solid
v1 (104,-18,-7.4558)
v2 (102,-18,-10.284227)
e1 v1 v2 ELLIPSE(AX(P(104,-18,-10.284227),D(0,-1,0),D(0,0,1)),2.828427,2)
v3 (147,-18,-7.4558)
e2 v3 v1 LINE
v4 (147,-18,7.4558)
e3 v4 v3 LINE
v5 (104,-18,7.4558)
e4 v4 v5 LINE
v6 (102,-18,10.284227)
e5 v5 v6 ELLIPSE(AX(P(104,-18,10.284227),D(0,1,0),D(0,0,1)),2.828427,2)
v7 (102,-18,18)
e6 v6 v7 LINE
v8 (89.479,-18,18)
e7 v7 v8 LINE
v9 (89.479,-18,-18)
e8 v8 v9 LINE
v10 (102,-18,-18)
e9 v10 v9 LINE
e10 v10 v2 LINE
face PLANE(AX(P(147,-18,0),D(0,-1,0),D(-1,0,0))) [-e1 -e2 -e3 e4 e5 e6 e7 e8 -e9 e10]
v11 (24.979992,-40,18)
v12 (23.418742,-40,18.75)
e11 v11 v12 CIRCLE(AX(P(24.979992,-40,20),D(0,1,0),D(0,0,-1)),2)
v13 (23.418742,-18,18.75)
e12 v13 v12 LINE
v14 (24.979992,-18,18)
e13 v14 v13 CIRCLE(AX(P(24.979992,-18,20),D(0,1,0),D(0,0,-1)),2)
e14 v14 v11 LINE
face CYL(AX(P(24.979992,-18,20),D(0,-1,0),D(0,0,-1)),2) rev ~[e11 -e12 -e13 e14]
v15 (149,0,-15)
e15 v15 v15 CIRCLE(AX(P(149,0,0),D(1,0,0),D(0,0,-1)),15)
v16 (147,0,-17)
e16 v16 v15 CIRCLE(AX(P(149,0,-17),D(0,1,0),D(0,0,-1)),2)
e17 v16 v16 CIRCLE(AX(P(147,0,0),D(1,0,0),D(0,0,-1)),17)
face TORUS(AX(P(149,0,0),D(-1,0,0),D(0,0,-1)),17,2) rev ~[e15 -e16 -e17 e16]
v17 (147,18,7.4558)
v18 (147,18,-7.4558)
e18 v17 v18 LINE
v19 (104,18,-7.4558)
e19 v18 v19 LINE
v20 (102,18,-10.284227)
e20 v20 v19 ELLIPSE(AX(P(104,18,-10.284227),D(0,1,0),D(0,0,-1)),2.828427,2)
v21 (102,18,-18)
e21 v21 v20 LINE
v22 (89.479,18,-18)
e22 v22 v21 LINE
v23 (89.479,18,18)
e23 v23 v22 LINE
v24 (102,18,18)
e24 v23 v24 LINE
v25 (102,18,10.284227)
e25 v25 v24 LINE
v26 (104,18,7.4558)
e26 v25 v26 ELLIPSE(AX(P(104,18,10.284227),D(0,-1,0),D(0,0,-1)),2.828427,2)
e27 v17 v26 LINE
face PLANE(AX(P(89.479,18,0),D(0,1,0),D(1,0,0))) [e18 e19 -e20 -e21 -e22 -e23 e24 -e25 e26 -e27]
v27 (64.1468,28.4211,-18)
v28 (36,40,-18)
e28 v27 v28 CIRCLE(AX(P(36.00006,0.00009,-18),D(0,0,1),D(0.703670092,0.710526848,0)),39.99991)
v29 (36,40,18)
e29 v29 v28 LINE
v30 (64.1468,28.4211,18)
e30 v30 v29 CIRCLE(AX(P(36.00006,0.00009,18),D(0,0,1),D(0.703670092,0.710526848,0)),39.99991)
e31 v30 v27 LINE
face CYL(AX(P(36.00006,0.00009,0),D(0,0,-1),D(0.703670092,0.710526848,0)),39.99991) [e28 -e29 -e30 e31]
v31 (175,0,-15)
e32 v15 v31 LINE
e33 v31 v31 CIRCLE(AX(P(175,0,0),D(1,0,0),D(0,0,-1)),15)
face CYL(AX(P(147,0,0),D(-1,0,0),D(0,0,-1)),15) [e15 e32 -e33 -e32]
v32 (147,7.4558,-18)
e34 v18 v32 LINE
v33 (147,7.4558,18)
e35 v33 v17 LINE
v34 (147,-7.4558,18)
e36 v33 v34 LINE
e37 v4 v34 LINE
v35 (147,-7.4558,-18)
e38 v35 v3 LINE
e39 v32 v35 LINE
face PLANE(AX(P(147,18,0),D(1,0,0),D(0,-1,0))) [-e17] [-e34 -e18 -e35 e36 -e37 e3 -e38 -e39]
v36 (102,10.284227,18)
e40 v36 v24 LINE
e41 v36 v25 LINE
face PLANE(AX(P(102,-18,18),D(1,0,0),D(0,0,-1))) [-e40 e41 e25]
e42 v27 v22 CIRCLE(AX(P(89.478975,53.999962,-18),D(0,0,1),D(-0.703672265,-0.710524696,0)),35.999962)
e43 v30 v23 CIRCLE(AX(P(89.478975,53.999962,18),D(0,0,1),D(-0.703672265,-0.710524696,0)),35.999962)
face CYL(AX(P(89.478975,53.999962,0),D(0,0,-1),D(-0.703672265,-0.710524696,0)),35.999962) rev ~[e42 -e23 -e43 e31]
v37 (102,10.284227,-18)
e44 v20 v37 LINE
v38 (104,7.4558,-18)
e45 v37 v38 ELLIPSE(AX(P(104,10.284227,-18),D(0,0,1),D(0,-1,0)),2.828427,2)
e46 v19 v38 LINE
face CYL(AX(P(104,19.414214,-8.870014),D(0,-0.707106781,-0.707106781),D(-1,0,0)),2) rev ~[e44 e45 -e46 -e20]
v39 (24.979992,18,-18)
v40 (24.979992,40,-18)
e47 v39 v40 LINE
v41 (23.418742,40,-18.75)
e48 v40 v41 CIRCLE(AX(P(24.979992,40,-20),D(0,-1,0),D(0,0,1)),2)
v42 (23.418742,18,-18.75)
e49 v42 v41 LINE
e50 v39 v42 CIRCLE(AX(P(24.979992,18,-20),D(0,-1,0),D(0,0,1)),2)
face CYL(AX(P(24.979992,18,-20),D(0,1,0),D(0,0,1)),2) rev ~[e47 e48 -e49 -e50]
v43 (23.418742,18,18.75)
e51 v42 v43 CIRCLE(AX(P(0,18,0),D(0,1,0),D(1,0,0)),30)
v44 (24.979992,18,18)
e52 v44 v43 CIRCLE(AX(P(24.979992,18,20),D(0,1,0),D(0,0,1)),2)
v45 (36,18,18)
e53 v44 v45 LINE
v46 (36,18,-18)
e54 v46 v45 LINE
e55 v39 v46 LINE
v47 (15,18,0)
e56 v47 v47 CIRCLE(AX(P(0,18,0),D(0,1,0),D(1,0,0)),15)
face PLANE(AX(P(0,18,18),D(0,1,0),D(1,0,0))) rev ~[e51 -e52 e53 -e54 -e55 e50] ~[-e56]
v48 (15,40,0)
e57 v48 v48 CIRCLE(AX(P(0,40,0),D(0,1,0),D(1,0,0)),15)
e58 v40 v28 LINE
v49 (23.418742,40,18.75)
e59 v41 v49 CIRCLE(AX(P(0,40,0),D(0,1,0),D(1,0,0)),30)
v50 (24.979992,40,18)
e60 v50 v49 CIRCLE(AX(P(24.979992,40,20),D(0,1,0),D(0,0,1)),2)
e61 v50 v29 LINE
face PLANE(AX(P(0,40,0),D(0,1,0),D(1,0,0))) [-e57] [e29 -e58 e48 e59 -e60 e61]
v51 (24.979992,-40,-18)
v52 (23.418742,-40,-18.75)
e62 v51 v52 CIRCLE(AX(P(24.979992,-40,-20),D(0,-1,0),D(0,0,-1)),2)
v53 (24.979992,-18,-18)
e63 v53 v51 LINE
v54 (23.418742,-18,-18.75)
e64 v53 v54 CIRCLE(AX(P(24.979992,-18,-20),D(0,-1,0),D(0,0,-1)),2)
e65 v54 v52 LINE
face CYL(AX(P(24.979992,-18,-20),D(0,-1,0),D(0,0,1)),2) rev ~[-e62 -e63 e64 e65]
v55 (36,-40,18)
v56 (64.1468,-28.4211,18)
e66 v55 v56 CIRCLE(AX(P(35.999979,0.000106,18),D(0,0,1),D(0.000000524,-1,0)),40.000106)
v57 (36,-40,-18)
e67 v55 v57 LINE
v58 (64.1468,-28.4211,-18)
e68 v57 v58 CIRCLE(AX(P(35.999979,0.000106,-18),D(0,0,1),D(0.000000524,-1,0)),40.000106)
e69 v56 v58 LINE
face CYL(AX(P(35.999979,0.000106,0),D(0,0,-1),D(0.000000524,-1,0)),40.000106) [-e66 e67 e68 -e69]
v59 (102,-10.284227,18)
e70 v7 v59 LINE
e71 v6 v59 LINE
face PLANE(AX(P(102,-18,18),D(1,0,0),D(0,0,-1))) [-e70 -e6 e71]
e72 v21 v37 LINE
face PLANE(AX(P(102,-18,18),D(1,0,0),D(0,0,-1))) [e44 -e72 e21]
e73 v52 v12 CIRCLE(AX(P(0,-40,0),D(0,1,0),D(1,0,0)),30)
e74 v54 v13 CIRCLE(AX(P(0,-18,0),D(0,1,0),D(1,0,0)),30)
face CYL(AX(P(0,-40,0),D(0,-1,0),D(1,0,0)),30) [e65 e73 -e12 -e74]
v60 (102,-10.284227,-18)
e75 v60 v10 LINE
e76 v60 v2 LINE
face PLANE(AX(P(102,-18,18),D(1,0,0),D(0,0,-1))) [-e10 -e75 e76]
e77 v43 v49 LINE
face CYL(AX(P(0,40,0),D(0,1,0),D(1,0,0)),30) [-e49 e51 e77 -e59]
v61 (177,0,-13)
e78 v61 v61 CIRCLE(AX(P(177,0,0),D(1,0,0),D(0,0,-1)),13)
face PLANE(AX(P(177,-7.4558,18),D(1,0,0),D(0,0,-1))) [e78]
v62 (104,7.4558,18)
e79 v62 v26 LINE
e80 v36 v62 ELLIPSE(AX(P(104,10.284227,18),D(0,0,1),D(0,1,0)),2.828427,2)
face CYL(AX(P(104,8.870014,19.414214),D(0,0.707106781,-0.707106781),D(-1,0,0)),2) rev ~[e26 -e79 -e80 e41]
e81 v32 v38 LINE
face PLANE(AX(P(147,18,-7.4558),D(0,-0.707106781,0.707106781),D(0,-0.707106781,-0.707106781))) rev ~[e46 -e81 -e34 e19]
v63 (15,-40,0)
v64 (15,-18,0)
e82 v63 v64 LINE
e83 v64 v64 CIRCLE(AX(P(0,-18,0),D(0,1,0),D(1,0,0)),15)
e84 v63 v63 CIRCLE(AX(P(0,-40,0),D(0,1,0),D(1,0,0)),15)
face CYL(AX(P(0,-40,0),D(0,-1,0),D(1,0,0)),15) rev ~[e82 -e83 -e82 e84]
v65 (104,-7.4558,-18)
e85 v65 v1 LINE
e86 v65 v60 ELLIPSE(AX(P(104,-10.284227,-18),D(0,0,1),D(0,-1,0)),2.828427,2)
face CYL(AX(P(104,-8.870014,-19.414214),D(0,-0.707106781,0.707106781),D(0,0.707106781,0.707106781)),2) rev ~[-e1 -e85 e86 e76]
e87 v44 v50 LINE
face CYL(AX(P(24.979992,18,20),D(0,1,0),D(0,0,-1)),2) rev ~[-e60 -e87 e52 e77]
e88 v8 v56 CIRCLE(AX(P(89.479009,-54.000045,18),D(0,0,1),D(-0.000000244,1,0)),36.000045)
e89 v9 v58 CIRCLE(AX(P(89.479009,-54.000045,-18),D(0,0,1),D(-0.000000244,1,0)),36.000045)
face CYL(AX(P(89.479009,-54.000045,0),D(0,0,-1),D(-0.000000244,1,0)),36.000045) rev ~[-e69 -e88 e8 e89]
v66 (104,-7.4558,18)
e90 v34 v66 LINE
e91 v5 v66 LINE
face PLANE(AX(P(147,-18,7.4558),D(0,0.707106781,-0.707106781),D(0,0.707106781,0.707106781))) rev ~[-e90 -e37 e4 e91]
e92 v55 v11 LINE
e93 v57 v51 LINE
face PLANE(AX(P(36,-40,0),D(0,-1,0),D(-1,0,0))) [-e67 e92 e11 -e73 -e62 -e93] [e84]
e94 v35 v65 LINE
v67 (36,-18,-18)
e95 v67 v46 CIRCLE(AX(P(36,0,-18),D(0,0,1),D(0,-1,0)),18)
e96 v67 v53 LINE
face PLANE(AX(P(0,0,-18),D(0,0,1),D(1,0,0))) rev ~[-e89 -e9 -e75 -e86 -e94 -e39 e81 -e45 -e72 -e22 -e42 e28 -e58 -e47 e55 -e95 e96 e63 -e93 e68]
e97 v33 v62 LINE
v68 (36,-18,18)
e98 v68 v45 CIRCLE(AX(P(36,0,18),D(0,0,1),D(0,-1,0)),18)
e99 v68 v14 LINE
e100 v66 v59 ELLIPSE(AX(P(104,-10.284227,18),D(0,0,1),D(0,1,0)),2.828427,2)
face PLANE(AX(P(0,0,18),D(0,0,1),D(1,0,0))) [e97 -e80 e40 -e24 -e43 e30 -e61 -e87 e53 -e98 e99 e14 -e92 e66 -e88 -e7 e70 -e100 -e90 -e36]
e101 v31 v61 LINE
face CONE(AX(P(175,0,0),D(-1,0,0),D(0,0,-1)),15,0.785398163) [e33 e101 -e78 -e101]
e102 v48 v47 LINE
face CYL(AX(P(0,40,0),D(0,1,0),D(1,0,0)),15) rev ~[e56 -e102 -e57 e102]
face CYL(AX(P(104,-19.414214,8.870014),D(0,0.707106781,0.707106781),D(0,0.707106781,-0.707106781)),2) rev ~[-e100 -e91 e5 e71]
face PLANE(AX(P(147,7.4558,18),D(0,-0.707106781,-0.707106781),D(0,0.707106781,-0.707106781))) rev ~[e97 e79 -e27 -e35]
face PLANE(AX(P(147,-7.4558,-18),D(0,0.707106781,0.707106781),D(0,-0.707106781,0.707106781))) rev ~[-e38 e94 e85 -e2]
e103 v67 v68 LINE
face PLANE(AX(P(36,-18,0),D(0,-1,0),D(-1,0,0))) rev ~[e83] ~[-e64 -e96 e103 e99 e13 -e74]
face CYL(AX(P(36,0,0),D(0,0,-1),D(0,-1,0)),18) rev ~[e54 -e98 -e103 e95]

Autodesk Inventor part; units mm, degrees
ref_plane "YZ Plane" through (0, 0, 0) normal (1, 0, 0) x (0, 1, 0)
ref_plane "XZ Plane" through (0, 0, 0) normal (0, 1, 0) x (-1, 0, 0)
ref_plane "XY Plane" through (0, 0, 0) normal (0, 0, 1) x (1, 0, 0)
sketch "Sketch2" plane through (0, 0, 0) normal (0, 0, 1) x (1, 0, 0)
  line L0 (0, 18) -> (36, 18)
  line L1 (36, -18) -> (0, -18)
  arc A0 (36, -18) -> (36, 18) centre (36, 0) ccw
  line L2 (0, 40) -> (36, 40)
  line L3 (36, -40) -> (0, -40)
  line L4 (0, 40) -> (0, 18)
  line L5 (0, -18) -> (0, -40)
  line L6 (89.479, 18) -> (147, 18)
  line L7 (147, 18) -> (147, -18)
  line L8 (147, -18) -> (89.479, -18)
  arc A1 (36, -40) -> (64.1468, -28.4211) centre (36, 0) ccw
  arc A2 (64.1468, 28.4211) -> (36, 40) centre (36, 0) ccw
  line L9 (0, 75.6) -> (0, -75.6) projected
  arc A3 (64.1468, 28.4211) -> (89.479, 18) centre (89.479, 54) ccw
  arc A4 (89.479, -18) -> (64.1468, -28.4211) centre (89.479, -54) ccw
  point P0 (0, 0)
  point P1 (0, 0)
  point P2 (71.7211, 18)
  point P3 (71.7211, -18)
  dimension "d3" = 147
  dimension "d4" = 36
  dimension "d5" = 18
  dimension "d6" = 36
extrude "Extrusion1" add sketch "Sketch2" along normal mid plane 36 contours L4 L2 A2 A3 L6 L7 L8 A4 A1 L3 L5 L1 A0 L0
sketch "Sketch3" plane through (0, 40, 18) normal (0, 1, 0) x (1, 0, 0)
  circle A0 centre (0, 18) radius 30
  dimension "d11" = 60
extrude "Extrusion2" add sketch "Sketch3" against normal blind 22
sketch "Sketch4" plane through (36, 40, 18) normal (0, 1, 0) x (1, 0, 0)
  circle A0 centre (-36, 18) radius 15
  dimension "d14" = 30
extrude "Extrusion3" cut sketch "Sketch4" against normal blind 22
mirror "Mirror1" about plane through (0, 0, 0) normal (0, 1, 0) of "Extrusion3", "Extrusion2"
sketch "Sketch5" plane through (147, -18, 18) normal (1, 0, 0) x (0, 0, -1)
  line L0 (36, 36) -> (36, 0) projected
  line L1 (36, 10.5442) -> (25.4558, 0)
  line L2 (25.4558, 0) -> (10.5442, 0)
  line L3 (10.5442, 0) -> (0, 10.5442)
  line L4 (0, 10.5442) -> (0, 25.4558)
  line L5 (0, 25.4558) -> (10.5442, 36)
  line L6 (10.5442, 36) -> (25.4558, 36)
  line L7 (25.4558, 36) -> (36, 25.4558)
  line L8 (36, 25.4558) -> (36, 10.5442)
  line L9 (36, 36) -> (0, 36) projected
  line L10 (0, 0) -> (0, 36) projected
  line L11 (36, 0) -> (0, 0) projected
  line L12 (36, 36) -> (36, 0) projected
  point P0 (18, 18)
  point P1 (18, 18)
  point P2 (36, 18)
  point P3 (36, 36)
  point P4 (36, 0)
extrude "Extrusion4" cut sketch "Sketch5" against normal blind 45 contours L0 L7 L9 | L0 L11 L1 | L5 L10 L9 | L11 L10 L3
sketch "Sketch6" plane through (147, -7.4558, 18) normal (1, 0, 0) x (0, 0, -1)
  circle A0 centre (18, 7.4558) radius 15
  dimension "d19" = 30
extrude "Extrusion5" add sketch "Sketch6" along normal blind 30
fillet "Fillet1" radius 2 9 edges at (24, 29, 18) (24, -29, 18) (102, 12.7279, 12.7279) (147, 0, 15) (24, 29, -18) (24, -29, -18) (102, 12.7279, -12.7279) (102, -12.7279, -12.7279) (102, -12.7279, 12.7279)
chamfer "Chamfer1" distance 2 angle 45 1 edges at (177, 0, 15)
properties part number "fork end"
